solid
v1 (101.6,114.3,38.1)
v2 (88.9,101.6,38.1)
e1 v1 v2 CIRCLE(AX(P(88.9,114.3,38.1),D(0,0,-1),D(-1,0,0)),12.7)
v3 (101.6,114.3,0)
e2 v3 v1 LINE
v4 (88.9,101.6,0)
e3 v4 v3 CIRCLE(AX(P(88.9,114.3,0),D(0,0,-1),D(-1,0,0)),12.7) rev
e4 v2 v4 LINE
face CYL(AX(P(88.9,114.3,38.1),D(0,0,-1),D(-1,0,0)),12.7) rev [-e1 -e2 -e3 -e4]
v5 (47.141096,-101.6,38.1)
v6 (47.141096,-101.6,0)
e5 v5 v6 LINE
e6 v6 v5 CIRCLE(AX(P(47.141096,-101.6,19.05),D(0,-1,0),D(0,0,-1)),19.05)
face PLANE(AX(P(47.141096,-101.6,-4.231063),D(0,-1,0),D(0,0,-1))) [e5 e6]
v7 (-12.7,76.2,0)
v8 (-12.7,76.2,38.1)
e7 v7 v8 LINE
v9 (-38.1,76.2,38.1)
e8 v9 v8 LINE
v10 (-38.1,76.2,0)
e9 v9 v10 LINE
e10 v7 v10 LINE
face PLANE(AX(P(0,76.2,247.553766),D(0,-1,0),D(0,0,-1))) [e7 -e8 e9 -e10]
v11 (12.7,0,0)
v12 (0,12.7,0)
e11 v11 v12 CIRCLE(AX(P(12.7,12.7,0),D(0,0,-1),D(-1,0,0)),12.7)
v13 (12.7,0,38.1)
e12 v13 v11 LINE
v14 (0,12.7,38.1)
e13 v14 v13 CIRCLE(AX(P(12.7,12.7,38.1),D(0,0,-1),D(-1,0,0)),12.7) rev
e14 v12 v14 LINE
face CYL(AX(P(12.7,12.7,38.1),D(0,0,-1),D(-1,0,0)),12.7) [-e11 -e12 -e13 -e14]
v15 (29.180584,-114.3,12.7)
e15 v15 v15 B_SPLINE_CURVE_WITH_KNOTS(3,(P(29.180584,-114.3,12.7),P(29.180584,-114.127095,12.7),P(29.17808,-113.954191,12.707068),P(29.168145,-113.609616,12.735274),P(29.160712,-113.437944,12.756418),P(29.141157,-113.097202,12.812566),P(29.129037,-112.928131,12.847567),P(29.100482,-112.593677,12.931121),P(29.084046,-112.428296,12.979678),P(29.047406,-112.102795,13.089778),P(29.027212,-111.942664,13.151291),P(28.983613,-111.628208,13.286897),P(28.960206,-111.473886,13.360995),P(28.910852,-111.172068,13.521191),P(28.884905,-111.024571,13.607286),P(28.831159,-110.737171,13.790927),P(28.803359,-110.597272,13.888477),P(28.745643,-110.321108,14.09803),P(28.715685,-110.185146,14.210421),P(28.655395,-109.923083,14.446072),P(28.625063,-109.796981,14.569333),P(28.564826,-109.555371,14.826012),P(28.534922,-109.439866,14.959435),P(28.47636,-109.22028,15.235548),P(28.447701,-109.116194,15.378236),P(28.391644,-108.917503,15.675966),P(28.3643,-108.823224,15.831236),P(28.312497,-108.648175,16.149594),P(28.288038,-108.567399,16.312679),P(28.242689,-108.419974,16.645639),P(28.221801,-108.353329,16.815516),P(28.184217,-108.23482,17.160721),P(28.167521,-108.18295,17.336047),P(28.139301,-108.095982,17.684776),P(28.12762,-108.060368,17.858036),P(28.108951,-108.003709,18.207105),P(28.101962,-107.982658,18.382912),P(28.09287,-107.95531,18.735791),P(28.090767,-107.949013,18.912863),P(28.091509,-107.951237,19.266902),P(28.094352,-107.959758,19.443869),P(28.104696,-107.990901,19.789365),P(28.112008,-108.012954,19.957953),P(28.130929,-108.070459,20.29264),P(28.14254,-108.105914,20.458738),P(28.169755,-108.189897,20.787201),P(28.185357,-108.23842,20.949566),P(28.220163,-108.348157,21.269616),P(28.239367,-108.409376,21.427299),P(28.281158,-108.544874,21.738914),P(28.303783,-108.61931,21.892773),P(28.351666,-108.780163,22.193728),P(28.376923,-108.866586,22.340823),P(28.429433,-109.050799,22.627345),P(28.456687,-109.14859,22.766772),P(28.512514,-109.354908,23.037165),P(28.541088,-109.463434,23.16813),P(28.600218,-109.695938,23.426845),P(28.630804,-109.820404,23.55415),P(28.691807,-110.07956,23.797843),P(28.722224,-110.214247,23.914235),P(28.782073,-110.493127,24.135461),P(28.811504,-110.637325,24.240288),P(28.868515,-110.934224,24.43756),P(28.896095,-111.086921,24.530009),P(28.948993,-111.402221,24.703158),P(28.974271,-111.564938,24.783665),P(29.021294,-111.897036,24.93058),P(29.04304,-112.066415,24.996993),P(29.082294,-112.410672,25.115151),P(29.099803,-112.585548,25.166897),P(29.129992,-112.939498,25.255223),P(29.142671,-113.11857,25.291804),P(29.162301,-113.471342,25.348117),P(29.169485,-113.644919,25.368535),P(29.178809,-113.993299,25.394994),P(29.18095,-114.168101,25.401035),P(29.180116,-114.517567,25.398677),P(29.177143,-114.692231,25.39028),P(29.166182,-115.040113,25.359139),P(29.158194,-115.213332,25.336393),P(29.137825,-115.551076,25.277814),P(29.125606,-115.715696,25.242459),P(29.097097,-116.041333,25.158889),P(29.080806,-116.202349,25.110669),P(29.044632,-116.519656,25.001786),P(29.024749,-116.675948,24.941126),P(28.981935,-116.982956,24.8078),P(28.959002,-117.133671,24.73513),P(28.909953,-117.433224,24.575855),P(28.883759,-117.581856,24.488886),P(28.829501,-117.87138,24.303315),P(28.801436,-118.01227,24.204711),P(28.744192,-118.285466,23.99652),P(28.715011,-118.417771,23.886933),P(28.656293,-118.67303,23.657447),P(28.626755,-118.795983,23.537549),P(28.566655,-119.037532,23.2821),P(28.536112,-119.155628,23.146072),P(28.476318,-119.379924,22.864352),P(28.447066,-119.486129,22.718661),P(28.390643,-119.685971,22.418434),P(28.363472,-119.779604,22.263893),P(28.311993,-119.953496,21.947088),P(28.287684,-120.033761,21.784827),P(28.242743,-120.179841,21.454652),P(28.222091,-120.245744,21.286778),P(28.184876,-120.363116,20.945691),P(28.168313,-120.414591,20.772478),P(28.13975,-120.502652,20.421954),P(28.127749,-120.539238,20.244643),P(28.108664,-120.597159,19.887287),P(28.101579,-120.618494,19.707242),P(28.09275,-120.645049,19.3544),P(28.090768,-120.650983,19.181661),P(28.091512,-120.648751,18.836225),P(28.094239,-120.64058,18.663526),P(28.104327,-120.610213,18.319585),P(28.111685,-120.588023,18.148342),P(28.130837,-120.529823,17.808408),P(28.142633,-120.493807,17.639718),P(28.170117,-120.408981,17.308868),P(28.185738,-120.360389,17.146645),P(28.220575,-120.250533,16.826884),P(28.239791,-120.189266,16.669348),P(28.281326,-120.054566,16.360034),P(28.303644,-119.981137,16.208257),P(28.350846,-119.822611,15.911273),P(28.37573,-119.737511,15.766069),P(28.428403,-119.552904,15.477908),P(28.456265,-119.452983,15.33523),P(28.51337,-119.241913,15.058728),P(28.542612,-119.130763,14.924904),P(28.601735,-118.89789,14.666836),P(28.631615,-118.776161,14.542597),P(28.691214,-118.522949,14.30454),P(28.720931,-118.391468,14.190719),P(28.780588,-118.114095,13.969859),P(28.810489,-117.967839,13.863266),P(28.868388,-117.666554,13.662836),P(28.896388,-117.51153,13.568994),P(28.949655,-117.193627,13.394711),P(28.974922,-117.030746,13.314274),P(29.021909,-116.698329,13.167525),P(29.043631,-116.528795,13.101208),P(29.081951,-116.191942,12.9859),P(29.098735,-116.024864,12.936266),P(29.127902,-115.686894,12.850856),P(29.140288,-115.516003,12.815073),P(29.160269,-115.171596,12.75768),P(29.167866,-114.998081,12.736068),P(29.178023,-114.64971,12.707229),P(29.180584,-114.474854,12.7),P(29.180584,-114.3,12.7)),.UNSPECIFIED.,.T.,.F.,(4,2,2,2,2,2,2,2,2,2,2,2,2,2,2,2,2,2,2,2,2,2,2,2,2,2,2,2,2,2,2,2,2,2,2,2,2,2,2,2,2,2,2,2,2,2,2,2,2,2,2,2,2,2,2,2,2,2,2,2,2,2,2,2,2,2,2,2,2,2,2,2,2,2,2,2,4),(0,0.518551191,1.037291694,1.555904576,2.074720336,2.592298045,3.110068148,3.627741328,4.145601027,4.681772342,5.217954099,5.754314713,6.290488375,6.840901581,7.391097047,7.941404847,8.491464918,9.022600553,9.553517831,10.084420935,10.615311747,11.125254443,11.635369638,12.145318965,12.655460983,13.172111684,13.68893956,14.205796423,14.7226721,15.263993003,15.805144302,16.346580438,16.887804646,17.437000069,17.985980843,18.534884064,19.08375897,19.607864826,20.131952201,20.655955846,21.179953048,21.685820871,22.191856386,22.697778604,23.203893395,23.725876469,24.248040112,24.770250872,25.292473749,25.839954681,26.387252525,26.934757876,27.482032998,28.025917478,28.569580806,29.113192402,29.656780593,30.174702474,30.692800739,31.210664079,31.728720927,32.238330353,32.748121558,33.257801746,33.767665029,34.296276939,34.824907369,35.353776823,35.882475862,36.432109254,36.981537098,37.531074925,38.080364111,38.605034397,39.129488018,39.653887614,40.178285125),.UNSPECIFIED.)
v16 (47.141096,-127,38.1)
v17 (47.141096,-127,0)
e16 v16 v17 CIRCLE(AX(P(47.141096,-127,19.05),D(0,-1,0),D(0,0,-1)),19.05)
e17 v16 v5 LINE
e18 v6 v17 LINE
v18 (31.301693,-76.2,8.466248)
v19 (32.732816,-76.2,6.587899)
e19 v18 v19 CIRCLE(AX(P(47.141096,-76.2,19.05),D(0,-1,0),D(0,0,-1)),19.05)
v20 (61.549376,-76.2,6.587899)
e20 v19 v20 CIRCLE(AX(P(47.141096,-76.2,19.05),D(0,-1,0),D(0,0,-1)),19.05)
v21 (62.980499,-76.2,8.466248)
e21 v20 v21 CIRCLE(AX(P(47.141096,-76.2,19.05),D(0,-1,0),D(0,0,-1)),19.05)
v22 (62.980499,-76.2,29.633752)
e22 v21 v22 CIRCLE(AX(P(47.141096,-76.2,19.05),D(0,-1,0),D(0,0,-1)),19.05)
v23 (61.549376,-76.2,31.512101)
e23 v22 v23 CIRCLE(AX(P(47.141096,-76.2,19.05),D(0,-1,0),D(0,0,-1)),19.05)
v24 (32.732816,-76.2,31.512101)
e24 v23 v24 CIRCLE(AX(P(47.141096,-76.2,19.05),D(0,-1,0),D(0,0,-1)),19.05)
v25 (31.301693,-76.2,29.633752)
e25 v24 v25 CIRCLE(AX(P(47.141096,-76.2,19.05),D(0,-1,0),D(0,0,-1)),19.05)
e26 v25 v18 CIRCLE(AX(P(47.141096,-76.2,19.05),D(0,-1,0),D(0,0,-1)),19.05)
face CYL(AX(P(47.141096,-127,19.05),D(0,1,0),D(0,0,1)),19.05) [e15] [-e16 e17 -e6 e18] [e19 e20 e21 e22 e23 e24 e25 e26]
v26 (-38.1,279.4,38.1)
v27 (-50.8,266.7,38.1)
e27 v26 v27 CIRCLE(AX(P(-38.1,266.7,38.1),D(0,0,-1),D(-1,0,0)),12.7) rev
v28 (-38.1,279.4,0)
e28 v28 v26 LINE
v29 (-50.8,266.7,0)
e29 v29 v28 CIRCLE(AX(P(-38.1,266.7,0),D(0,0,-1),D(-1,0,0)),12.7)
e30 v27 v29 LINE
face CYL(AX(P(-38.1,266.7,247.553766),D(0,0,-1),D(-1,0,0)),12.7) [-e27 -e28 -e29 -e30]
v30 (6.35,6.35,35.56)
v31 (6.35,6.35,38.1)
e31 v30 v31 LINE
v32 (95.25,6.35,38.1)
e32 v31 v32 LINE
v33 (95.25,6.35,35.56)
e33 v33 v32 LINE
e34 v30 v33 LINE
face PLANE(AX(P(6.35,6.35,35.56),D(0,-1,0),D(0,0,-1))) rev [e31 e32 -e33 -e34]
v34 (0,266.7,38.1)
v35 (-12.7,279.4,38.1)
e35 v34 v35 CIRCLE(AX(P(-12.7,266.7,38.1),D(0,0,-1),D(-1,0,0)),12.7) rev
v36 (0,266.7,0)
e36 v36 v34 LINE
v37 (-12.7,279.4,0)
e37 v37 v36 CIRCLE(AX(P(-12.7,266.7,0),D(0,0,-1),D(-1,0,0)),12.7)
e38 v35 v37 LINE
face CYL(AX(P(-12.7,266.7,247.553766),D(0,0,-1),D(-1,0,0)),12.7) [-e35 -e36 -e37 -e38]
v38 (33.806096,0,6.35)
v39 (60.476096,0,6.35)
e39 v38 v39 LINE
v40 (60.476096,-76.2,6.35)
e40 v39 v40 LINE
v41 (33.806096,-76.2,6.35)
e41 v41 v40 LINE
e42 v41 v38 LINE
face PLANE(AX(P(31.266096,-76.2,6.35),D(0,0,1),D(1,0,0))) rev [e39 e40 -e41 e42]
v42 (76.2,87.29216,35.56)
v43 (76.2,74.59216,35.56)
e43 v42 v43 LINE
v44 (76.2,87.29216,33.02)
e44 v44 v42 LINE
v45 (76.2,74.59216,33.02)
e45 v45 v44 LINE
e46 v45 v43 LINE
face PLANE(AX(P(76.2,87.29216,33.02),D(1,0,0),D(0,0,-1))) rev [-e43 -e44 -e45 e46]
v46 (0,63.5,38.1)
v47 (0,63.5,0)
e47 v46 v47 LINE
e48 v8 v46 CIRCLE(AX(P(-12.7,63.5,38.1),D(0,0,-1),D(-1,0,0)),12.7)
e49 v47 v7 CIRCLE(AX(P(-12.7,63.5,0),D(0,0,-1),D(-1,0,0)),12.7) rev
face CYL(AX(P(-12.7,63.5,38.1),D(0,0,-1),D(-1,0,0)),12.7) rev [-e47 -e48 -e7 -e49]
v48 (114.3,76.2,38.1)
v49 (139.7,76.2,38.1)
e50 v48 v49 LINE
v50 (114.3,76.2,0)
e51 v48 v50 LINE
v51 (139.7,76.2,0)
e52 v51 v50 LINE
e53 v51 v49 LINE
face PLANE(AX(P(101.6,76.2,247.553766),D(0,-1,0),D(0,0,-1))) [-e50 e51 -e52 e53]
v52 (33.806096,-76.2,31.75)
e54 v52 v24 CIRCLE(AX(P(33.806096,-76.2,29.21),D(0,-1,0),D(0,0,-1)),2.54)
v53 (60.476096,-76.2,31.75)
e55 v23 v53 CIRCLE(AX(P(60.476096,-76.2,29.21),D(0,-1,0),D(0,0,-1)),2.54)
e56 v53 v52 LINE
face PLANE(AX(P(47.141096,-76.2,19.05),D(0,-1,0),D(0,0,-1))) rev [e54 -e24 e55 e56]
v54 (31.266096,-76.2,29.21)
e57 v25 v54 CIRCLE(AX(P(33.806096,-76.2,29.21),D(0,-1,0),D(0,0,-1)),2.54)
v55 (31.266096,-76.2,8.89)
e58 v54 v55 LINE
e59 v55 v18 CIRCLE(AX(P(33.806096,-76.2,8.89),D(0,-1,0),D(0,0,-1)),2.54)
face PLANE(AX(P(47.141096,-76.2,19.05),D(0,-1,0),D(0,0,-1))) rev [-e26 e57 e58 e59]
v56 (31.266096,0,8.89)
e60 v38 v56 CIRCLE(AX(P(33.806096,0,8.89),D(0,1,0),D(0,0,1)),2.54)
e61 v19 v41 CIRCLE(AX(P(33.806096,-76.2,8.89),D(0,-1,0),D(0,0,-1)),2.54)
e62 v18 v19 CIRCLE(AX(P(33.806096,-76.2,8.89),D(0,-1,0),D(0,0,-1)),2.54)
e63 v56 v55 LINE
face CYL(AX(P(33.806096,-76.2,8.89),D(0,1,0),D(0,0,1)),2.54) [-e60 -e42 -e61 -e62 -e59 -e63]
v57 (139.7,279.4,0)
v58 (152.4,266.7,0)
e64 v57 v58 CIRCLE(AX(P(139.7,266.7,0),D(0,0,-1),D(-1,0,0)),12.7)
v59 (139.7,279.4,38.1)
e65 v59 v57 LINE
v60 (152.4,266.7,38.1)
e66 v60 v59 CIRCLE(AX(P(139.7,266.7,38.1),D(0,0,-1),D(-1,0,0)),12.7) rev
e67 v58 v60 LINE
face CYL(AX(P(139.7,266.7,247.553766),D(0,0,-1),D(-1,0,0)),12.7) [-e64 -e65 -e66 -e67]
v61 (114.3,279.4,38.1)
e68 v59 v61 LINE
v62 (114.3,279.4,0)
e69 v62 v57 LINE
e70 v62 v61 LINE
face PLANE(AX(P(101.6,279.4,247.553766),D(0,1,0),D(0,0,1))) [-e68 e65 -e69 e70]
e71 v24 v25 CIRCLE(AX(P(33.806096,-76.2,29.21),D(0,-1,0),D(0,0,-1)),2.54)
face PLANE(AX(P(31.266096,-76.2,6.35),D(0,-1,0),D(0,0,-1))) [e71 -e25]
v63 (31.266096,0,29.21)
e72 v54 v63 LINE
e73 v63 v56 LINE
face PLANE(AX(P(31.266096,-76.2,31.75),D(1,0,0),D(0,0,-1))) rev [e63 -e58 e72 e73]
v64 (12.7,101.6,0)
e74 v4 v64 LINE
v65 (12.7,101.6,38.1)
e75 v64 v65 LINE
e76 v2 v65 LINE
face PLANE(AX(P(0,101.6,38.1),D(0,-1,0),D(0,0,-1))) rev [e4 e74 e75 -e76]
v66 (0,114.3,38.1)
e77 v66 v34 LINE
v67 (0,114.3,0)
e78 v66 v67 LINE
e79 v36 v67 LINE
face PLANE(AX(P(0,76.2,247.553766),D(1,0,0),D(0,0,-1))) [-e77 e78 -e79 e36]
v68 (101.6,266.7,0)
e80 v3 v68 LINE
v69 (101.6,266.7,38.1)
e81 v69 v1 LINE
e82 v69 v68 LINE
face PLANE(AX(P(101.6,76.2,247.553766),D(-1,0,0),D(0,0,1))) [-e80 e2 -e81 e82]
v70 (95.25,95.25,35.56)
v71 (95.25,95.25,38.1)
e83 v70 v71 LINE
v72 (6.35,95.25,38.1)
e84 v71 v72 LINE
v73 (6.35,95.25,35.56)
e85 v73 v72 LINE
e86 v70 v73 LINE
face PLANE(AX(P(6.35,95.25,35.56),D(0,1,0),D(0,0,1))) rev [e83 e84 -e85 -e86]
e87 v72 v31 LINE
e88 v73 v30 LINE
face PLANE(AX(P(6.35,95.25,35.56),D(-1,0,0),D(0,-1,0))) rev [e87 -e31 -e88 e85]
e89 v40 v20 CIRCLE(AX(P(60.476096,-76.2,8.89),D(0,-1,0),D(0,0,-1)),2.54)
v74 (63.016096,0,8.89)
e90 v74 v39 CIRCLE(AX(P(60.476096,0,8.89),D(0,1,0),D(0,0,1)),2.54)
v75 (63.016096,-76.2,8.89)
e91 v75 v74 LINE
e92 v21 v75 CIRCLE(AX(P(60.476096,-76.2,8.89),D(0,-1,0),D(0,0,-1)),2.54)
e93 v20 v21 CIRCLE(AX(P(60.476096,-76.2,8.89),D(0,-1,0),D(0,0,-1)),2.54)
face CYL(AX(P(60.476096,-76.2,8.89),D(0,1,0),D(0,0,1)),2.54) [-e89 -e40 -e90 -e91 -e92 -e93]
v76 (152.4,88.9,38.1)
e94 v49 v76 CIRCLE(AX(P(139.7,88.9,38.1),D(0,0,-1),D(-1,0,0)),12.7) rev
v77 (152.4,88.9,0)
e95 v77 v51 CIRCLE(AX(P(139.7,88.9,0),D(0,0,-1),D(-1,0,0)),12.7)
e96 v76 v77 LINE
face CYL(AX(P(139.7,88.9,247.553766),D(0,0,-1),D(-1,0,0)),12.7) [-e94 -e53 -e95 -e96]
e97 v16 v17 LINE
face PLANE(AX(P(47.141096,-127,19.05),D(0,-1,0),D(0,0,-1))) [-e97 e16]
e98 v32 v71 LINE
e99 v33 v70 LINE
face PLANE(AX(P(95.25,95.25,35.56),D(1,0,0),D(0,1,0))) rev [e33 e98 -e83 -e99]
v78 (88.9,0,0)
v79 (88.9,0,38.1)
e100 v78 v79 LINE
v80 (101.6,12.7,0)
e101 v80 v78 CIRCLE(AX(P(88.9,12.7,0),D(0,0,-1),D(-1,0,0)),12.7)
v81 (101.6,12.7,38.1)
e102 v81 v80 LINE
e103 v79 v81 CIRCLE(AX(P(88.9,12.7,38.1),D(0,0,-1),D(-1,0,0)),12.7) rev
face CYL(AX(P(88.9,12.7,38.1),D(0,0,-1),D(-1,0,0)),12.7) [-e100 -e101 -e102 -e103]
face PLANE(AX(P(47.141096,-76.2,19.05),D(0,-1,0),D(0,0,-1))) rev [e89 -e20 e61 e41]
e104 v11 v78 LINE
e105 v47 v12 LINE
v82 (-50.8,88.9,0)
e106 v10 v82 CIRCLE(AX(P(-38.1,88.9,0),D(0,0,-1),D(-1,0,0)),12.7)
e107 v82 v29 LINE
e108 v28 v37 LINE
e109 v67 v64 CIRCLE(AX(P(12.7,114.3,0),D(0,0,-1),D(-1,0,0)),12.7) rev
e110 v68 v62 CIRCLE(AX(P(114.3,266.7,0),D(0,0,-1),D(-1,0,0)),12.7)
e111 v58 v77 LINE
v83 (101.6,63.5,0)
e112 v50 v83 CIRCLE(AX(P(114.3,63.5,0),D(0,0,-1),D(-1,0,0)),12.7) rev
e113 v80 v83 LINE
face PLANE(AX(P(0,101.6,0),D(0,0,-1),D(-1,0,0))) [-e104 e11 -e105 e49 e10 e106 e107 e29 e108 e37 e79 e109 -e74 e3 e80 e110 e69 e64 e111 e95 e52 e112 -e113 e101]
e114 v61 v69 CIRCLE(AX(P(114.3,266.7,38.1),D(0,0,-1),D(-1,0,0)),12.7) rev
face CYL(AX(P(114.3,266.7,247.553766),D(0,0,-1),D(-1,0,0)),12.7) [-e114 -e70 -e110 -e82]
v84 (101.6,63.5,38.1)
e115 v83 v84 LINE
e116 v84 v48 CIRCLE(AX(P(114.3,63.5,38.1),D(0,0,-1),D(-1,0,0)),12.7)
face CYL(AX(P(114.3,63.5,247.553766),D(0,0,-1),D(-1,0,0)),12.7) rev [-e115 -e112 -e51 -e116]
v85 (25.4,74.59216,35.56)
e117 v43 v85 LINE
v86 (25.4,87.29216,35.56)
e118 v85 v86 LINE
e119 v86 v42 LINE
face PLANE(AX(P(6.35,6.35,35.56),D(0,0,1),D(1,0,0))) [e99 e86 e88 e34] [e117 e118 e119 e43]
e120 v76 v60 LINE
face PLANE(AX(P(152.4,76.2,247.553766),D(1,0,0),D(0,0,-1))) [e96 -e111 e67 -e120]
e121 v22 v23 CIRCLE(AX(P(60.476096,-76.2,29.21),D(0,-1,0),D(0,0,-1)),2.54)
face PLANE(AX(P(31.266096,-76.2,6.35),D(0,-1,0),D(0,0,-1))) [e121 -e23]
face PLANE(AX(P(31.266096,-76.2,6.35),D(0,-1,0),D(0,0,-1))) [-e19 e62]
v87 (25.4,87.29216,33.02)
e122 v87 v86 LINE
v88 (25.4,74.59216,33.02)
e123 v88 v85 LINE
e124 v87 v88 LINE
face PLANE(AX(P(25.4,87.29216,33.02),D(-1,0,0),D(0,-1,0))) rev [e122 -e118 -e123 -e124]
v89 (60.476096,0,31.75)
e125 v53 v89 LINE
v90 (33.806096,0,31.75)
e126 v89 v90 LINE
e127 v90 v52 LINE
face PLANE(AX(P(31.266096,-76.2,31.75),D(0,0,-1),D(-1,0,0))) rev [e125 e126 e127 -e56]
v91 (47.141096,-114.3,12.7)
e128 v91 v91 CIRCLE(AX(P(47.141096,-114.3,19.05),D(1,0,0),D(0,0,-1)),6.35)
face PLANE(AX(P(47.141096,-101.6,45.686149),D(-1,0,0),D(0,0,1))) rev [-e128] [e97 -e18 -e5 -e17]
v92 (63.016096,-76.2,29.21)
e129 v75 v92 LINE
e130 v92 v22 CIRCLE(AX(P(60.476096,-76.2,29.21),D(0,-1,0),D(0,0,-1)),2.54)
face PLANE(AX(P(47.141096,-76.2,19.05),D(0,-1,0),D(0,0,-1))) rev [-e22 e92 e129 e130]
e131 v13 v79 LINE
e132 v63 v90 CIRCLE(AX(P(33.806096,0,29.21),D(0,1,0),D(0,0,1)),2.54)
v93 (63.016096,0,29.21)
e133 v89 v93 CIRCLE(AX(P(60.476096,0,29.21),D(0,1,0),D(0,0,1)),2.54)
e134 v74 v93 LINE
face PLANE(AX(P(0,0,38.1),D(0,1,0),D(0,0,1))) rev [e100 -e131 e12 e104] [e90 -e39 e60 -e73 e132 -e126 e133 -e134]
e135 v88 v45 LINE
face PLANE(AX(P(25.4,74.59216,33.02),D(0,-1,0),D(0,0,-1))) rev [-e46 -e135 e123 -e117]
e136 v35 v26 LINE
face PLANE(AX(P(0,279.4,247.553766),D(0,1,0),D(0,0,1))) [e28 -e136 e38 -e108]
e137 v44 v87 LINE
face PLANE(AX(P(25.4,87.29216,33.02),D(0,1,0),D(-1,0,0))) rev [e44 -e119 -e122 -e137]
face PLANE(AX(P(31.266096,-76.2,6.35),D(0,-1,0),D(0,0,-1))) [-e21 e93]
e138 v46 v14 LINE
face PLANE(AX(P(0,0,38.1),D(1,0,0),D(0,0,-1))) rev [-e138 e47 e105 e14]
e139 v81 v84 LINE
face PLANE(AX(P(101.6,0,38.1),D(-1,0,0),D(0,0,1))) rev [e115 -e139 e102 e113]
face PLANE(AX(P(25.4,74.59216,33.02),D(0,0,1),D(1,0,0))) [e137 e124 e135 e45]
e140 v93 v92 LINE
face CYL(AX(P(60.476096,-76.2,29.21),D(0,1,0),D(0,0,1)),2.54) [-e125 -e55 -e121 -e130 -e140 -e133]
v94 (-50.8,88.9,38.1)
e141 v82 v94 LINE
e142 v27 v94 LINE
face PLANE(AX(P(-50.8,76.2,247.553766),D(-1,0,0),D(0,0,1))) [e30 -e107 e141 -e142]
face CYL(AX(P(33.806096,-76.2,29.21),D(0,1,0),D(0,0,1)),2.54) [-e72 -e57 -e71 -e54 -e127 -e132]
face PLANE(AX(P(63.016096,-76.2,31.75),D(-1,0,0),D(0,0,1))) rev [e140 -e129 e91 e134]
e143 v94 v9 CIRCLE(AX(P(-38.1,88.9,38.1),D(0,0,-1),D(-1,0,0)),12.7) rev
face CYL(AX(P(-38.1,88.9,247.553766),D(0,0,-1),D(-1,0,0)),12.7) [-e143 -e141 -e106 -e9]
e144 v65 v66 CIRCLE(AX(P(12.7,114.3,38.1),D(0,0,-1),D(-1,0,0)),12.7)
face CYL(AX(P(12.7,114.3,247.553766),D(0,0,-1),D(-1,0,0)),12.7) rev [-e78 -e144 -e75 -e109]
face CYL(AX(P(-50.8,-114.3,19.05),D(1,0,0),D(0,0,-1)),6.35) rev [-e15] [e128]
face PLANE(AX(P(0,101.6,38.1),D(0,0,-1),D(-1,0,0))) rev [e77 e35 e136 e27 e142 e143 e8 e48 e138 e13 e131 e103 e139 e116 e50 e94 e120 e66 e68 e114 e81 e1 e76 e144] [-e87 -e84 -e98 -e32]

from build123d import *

# Parameters (mm, degrees)
SKETCH1_W           = 101.6
SKETCH1_H           = 101.6
BOSS_EXTRUDE1_DEPTH = 38.1
SKETCH2_W           = 50.8
SKETCH2_H           = 12.7
CUT_EXTRUDE1_DEPTH  = 5.08
SKETCH3_W           = 88.9
SKETCH3_H           = 88.9
CUT_EXTRUDE2_DEPTH  = 2.54
SKETCH4_W           = 31.75
SKETCH4_H           = 25.4
BOSS_EXTRUDE2_DEPTH = 76.2
SKETCH6_R           = 19.05
BOSS_EXTRUDE3_DEPTH = 50.8
SKETCH7_W           = 24.863041021
SKETCH7_H           = 49.917211664
CUT_EXTRUDE3_DEPTH  = 25.4
SKETCH8_W           = 50.8
SKETCH8_H           = 203.2
BOSS_EXTRUDE4_DEPTH = 38.1
FILLET1_R           = 12.7
SKETCH9_R           = 6.35
CUT_EXTRUDE4_DEPTH  = 301.990708903
FILLET2_R           = 2.54


with BuildPart() as part:
    # Sketch1 → Boss-Extrude1 (new body)
    with BuildSketch(Plane.XY):
        with Locations((50.8, 50.8)):
            Rectangle(SKETCH1_W, SKETCH1_H)
    extrude(amount=BOSS_EXTRUDE1_DEPTH)

    # Sketch2 → Cut-Extrude1 (cut)
    with BuildSketch(Plane.XY.offset(38.1)):
        with Locations((50.8, 80.942159742)):
            Rectangle(SKETCH2_W, SKETCH2_H)
    extrude(amount=-CUT_EXTRUDE1_DEPTH, mode=Mode.SUBTRACT)

    # Sketch3 → Cut-Extrude2 (cut)
    with BuildSketch(Plane.XY.offset(38.1)):
        with Locations((50.8, 50.8)):
            Rectangle(SKETCH3_W, SKETCH3_H)
    extrude(amount=-CUT_EXTRUDE2_DEPTH, mode=Mode.SUBTRACT)

    # Sketch4 → Boss-Extrude2 (add)
    with BuildSketch(Plane.XZ):
        with Locations((47.141096121, 19.05)):
            Rectangle(SKETCH4_W, SKETCH4_H)
    extrude(amount=BOSS_EXTRUDE2_DEPTH)

    # Sketch6 → Boss-Extrude3 (add)
    with BuildSketch(Plane.XZ.offset(76.2)):
        with Locations(Location((47.141096121, 19.05, 0), (0, 0, 138.189685104))):
            Circle(SKETCH6_R)
    extrude(amount=BOSS_EXTRUDE3_DEPTH)

    # Sketch7 → Cut-Extrude3 (cut)
    with BuildSketch(Plane.XZ.offset(127)):
        with Locations((59.572616632, 20.72754322)):
            Rectangle(SKETCH7_W, SKETCH7_H)
    extrude(amount=-CUT_EXTRUDE3_DEPTH, mode=Mode.SUBTRACT)

    # Sketch8 → Boss-Extrude4 (add)
    with BuildSketch(Plane(origin=(0, 0, 0), x_dir=(-1, 0, 0), z_dir=(0, 0, -1))):
        with Locations((25.4, 177.8)):
            Rectangle(SKETCH8_W, SKETCH8_H)
        with Locations((-127, 177.8)):
            Rectangle(SKETCH8_W, SKETCH8_H)
    extrude(amount=-BOSS_EXTRUDE4_DEPTH)

    # Fillet1
    fillet1_edges = [part.edges().sort_by_distance(p)[0] for p in [
        (101.6, 0, 19.05),
        (0, 0, 19.05),
        (0, 76.2, 19.05),
        (101.6, 76.2, 19.05),
        (101.6, 101.6, 19.05),
        (0, 101.6, 19.05),
        (152.4, 76.2, 19.05),
        (-50.8, 76.2, 19.05),
        (-50.8, 279.4, 19.05),
        (101.6, 279.4, 19.05),
        (152.4, 279.4, 19.05),
        (0, 279.4, 19.05),
    ]]
    fillet(fillet1_edges, radius=FILLET1_R)

    # Sketch9 → Cut-Extrude4 (cut, through all)
    with BuildSketch(Plane(origin=(47.141096121, 0, 0), x_dir=(0, 0, -1), z_dir=(1, 0, 0))):
        with Locations((-19.05, -114.3)):
            Circle(SKETCH9_R)
    extrude(amount=-CUT_EXTRUDE4_DEPTH, mode=Mode.SUBTRACT)

    # Fillet2
    # the kernel refuses this fillet: 2.54 mm, written as the material it takes off along each edge
    with BuildSketch(Plane(origin=(31.266096121, 0, 31.75), x_dir=(1, 0, 0), z_dir=(0, -1, 0))) as fillet2_piece_1:
        with BuildLine():
            CenterArc((FILLET2_R, -FILLET2_R), FILLET2_R, 90, 90)
            Line((0, -FILLET2_R), (0, 0))
            Line((0, 0), (FILLET2_R, 0))
        make_face()
    extrude(amount=76.2, mode=Mode.SUBTRACT)
    with BuildSketch(Plane(origin=(31.266096121, 0, 6.35), x_dir=(1, 0, 0), z_dir=(0, -1, 0)), Plane(origin=(63.016096121, 0, 6.35), x_dir=(0, 0, 1), z_dir=(0, -1, 0)), Plane(origin=(63.016096121, 0, 31.75), x_dir=(-1, 0, 0), z_dir=(0, -1, 0))) as fillet2_piece_2:
        with BuildLine():
            CenterArc((FILLET2_R, FILLET2_R), FILLET2_R, 180, 90)
            Line((0, FILLET2_R), (0, 0))
            Line((0, 0), (FILLET2_R, 0))
        make_face()
    extrude(amount=76.2, mode=Mode.SUBTRACT)


solid = part.part
